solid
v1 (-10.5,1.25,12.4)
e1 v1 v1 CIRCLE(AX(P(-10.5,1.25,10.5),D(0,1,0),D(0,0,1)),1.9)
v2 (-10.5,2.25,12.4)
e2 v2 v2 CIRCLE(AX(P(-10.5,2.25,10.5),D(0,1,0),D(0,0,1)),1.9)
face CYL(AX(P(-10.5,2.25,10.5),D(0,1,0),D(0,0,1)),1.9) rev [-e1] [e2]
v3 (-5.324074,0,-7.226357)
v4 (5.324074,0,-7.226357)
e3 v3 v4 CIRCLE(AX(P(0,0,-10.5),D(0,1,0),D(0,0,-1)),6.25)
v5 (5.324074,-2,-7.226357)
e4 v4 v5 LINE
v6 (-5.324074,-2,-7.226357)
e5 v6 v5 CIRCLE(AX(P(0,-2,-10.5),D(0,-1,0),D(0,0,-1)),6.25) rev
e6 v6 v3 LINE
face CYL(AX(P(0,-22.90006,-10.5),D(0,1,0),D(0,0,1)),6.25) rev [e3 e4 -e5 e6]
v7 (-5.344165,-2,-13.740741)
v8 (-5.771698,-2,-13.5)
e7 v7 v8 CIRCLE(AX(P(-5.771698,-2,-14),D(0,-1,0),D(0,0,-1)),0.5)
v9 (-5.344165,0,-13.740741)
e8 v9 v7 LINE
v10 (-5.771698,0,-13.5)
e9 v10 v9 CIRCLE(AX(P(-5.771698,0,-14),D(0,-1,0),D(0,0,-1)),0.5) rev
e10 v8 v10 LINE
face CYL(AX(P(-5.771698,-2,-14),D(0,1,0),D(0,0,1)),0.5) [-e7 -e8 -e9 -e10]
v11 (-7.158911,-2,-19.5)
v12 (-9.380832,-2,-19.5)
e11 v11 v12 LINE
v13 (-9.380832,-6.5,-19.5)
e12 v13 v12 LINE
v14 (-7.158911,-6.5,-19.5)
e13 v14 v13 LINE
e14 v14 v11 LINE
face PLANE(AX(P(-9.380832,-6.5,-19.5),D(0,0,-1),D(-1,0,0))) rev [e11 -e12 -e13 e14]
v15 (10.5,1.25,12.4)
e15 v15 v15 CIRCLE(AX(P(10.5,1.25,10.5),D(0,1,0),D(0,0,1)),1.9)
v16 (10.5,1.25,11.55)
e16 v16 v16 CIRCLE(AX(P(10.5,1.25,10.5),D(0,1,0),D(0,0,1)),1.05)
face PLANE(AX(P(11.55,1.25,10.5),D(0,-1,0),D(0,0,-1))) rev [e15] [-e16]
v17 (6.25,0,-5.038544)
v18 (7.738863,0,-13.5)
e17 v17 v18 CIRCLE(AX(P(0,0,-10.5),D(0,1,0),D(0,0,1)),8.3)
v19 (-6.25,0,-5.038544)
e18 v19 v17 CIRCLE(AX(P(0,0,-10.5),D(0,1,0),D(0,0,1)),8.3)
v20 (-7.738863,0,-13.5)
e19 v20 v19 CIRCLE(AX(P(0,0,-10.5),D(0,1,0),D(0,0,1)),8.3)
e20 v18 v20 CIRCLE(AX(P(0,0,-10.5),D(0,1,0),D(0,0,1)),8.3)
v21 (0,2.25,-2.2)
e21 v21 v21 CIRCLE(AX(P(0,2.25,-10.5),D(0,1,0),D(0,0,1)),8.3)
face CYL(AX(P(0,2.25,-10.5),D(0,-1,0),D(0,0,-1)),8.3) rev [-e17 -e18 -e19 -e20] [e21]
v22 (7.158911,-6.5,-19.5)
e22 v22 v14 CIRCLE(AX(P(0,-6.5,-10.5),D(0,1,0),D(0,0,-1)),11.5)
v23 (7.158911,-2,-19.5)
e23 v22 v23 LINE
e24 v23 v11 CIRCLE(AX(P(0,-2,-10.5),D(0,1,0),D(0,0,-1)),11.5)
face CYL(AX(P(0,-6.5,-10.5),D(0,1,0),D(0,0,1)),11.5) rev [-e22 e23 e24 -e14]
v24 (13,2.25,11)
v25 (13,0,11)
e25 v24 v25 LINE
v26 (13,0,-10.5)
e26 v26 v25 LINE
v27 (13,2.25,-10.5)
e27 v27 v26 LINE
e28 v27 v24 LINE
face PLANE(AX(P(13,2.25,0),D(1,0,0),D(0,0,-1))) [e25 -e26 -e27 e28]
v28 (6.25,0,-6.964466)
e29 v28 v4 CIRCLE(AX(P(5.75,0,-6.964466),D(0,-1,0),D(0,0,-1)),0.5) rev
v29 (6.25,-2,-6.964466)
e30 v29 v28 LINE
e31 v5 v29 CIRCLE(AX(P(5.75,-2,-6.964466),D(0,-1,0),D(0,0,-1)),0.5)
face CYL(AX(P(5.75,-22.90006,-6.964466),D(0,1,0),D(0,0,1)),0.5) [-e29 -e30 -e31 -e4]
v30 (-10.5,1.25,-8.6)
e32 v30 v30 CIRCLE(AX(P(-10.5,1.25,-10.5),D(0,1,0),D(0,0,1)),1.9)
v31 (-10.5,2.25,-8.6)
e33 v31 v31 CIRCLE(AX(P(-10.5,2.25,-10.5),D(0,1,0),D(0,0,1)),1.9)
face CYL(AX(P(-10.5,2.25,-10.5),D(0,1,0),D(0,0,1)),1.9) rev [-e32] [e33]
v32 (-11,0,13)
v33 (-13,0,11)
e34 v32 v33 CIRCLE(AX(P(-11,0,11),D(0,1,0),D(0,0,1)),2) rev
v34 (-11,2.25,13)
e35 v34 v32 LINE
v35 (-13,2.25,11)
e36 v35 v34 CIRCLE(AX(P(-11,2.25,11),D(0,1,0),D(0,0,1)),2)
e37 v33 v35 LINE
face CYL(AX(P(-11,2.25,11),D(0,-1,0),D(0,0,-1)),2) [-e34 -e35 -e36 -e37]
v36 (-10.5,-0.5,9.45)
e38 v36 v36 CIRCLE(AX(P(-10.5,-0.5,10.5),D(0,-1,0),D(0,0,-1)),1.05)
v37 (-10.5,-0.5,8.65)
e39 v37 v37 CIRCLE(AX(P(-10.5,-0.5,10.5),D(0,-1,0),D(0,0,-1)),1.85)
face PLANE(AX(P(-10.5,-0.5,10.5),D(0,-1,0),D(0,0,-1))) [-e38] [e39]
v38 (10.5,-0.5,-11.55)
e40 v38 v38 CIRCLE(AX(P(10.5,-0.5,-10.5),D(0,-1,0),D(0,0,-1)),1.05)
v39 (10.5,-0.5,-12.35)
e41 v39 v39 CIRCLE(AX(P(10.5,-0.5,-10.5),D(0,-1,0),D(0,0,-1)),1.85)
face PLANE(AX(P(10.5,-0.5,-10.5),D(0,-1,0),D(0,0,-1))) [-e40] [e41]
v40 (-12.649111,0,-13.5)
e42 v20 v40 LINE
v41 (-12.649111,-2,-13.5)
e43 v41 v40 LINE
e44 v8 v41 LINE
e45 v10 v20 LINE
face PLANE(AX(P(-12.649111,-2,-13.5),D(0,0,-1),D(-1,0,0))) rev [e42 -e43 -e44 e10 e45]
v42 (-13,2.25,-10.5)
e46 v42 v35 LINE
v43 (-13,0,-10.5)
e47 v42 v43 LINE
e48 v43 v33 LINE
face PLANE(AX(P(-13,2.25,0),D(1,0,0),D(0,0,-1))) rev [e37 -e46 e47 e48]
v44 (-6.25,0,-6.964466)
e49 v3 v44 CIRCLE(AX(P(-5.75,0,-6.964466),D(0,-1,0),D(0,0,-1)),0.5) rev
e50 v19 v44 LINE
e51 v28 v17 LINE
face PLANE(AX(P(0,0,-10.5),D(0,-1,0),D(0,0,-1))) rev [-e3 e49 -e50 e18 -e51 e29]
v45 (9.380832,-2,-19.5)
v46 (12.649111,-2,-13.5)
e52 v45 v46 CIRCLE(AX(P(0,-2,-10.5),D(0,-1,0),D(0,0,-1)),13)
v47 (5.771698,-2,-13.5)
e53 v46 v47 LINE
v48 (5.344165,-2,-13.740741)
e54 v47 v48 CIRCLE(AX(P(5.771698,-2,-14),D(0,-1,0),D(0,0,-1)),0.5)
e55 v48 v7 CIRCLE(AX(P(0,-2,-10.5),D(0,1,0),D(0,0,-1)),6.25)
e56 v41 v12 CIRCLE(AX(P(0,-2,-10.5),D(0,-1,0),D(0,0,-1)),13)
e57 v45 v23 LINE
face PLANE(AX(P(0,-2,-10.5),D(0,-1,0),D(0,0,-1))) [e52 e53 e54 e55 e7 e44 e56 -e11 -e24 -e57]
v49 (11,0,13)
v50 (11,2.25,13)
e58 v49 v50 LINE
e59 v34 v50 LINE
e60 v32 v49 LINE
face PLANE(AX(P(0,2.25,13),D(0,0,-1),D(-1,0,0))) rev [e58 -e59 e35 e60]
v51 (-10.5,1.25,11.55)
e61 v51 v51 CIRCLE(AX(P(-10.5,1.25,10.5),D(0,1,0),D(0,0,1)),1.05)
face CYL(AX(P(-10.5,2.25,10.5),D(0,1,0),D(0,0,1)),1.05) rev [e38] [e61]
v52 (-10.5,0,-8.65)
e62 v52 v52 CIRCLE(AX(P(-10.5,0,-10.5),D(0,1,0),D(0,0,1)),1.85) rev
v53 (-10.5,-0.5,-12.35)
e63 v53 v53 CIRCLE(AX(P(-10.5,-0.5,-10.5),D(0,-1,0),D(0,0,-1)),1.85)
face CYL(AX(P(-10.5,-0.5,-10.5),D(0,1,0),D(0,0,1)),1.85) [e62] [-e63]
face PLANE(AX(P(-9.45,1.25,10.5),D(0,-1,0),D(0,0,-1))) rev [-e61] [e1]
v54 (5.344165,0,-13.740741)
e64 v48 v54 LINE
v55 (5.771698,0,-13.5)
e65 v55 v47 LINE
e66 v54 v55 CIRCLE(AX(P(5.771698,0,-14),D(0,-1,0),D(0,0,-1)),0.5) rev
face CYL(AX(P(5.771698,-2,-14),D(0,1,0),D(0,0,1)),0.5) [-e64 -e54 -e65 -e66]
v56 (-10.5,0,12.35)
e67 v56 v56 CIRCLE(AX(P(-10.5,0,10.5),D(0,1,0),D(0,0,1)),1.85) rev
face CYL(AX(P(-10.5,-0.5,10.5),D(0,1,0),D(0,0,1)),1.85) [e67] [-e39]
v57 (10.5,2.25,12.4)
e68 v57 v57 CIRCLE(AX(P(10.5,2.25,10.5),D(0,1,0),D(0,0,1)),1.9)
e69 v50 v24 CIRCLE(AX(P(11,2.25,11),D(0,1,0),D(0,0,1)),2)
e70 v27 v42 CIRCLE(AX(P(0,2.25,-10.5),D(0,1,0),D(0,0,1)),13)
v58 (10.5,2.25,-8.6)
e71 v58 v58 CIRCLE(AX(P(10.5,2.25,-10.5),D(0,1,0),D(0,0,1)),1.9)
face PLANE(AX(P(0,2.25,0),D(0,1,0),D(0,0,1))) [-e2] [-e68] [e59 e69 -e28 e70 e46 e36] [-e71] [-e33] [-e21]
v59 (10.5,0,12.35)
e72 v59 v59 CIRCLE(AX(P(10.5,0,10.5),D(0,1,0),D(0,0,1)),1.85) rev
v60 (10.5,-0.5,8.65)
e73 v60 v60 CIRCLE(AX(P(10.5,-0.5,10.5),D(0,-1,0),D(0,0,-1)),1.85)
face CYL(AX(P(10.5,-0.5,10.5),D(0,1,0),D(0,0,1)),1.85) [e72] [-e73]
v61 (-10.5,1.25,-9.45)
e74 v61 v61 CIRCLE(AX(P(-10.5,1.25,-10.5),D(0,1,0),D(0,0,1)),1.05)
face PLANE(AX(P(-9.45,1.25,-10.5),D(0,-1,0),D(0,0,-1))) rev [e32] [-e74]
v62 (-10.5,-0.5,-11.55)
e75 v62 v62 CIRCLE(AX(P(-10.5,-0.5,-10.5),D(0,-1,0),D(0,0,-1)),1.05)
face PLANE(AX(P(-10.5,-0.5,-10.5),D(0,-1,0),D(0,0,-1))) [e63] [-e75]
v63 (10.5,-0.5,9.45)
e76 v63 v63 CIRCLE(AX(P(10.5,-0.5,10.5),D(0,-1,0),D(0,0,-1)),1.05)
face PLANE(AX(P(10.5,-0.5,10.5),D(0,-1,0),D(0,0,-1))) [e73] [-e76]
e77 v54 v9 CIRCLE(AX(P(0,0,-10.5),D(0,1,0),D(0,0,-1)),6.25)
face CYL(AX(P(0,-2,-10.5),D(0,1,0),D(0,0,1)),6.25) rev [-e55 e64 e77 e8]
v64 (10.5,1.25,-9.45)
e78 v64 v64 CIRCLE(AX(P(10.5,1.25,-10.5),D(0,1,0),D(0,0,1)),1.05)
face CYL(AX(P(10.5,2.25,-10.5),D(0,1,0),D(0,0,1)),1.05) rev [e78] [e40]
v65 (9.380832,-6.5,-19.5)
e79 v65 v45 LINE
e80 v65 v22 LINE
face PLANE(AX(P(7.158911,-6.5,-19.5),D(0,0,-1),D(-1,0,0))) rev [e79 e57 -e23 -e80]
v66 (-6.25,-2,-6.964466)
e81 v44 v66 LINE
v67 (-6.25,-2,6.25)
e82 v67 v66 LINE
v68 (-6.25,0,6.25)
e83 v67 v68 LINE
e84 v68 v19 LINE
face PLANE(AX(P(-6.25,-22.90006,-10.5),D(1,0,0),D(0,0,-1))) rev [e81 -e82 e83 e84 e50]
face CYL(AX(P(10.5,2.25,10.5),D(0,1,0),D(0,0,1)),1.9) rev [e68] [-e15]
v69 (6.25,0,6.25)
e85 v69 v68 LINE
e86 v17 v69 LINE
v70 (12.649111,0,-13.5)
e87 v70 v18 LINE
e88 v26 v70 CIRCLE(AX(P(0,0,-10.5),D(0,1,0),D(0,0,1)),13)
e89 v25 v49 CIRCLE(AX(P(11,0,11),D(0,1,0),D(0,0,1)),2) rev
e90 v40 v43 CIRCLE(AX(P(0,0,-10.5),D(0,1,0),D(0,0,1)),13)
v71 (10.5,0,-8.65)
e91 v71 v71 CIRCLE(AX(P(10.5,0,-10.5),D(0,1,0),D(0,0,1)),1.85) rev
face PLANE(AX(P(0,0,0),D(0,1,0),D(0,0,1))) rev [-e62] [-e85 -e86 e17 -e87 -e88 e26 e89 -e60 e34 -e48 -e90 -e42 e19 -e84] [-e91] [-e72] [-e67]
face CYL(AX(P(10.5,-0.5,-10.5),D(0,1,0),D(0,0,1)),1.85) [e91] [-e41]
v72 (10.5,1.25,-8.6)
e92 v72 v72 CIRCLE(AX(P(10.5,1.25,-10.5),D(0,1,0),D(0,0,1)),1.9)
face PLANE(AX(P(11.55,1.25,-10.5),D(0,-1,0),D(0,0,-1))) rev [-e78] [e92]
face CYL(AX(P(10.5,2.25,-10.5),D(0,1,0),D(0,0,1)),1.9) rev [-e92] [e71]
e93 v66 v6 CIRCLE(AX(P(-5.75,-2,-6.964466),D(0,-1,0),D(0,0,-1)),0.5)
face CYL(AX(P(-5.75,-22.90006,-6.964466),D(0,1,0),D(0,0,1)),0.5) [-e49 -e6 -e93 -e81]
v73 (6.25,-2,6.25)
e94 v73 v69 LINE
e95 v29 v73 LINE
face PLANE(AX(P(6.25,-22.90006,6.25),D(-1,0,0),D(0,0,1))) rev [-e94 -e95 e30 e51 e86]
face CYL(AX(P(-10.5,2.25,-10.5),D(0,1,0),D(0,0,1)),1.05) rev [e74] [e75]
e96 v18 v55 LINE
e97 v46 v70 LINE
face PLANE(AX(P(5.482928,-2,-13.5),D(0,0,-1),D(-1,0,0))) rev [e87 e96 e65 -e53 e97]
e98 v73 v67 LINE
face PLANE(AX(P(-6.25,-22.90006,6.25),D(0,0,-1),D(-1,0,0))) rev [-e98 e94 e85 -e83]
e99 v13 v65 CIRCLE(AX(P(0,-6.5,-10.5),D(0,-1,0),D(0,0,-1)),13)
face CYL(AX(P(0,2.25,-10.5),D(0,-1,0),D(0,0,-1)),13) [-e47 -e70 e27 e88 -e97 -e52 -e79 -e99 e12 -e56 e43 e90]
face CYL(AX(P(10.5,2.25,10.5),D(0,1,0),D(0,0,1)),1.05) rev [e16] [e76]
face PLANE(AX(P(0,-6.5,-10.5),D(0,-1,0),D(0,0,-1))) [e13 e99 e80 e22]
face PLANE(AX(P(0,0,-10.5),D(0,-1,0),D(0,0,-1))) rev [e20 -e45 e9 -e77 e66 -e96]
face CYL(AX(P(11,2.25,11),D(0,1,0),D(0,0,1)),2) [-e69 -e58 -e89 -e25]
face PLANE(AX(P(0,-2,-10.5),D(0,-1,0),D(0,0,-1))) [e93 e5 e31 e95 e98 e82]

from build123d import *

# Parameters (mm, degrees)
SKETCH_1_R                   = 8.3
EXTRUDE_1_DEPTH              = 2.25
EXTRUDE_START                = 2
EXTRUDE_2_DEPTH              = 2
EXTRUDE_START_2              = 4.5
EXTRUDE_3_DEPTH              = 4.5
EXTRUDE_4_DEPTH              = 2
FILLET_1_R                   = 0.5
SKETCH_5_R                   = 1.85
EXTRUDE_5_DEPTH              = 0.5
HOLE_WIZARD_M2_1_D           = 2.1
HOLE_WIZARD_M2_1_CBORE_D     = 3.8
HOLE_WIZARD_M2_1_CBORE_DEPTH = 1
FILLET_2_R                   = 2


with BuildPart() as part:
    # ｽｹｯﾁ1 → ﾎﾞｽ - 押し出し1 (new body)
    with BuildSketch(Plane(origin=(0, 0, 0), x_dir=(1, 0, 0), z_dir=(0, 1, 0))):
        with BuildLine():
            ThreePointArc((13, 10.5), (0, 23.5), (-13, 10.5))
            Line((-13, 10.5), (-13, -13))
            Line((-13, -13), (13, -13))
            Line((13, -13), (13, 10.5))
        make_face()
        with Locations(Location((0, 10.5, 0), (0, 0, 270))):
            Circle(SKETCH_1_R, mode=Mode.SUBTRACT)
    extrude(amount=EXTRUDE_1_DEPTH)

    # ｽｹｯﾁ2 → ﾎﾞｽ - 押し出し2 (add)
    with BuildSketch(Plane.XZ.offset(EXTRUDE_START)):
        with BuildLine():
            Line((-12.649110641, -13.5), (-5.48292805, -13.5))
            ThreePointArc((-5.48292805, -13.5), (0, -16.75), (5.48292805, -13.5))
            Line((5.48292805, -13.5), (12.649110641, -13.5))
            ThreePointArc((12.649110641, -13.5), (0, -23.5), (-12.649110641, -13.5))
        make_face()
    extrude(amount=-EXTRUDE_2_DEPTH)

    # ｽｹｯﾁ3 → ﾎﾞｽ - 押し出し3 (add)
    with BuildSketch(Plane.XZ.offset(2).offset(EXTRUDE_START_2)):
        with BuildLine():
            Line((-9.38083152, -19.5), (-7.158910532, -19.5))
            ThreePointArc((-7.158910532, -19.5), (0, -22), (7.158910532, -19.5))
            Line((7.158910532, -19.5), (9.38083152, -19.5))
            ThreePointArc((9.38083152, -19.5), (0, -23.5), (-9.38083152, -19.5))
        make_face()
    extrude(amount=-EXTRUDE_3_DEPTH)

    # ｽｹｯﾁ4 → ﾎﾞｽ - 押し出し4 (add)
    with BuildSketch(Plane.XZ.offset(EXTRUDE_START)):
        with BuildLine():
            Line((-6.25, 6.25), (6.25, 6.25))
            Line((6.25, 6.25), (6.25, -10.5))
            ThreePointArc((6.25, -10.5), (0, -4.25), (-6.25, -10.5))
            Line((-6.25, -10.5), (-6.25, 6.25))
        make_face()
    extrude(amount=-EXTRUDE_4_DEPTH)

    # ﾌｨﾚｯﾄ1
    # the kernel refuses this fillet: 0.5 mm, written as the material it takes off along each edge
    with BuildSketch(Plane(origin=(5.48292805, -2.721925351, -13.5), x_dir=(1, 0, 0), z_dir=(0, 1, 0))) as fillet_1_piece_1:
        with BuildLine():
            CenterArc((0.28877014, 0.5), FILLET_1_R, 211.232929016, 58.767070984)
            ThreePointArc((-0.138763059, 0.240740741), (-0.068043475, 0.121141625), (0, 0))
            Line((0, 0), (0.28877014, 0))
        make_face()
    extrude(amount=3.443850702, mode=Mode.SUBTRACT)
    with BuildSketch(Plane(origin=(-5.48292805, -2.721925351, -13.5), x_dir=(-1, 0, 0), z_dir=(0, 1, 0))) as fillet_1_piece_2:
        with BuildLine():
            CenterArc((0.28877014, -0.5), FILLET_1_R, 90, 58.767070984)
            ThreePointArc((-0.138763059, -0.240740741), (-0.068043475, -0.121141625), (0, 0))
            Line((0, 0), (0.28877014, 0))
        make_face()
    extrude(amount=3.443850702, mode=Mode.SUBTRACT)
    with BuildSketch(Plane(origin=(-6.25, -10.838834765, -10.5), x_dir=(0, 0, 1), z_dir=(0, 1, 0))) as fillet_1_piece_3:
        with BuildLine():
            CenterArc((3.535533906, 0.5), FILLET_1_R, 121.586338097, 148.413661903)
            ThreePointArc((3.273642506, 0.925925926), (1.701034544, 0.235934696), (0, 0))
            Line((0, 0), (3.535533906, 0))
        make_face()
    extrude(amount=19.67766953, mode=Mode.SUBTRACT)
    with BuildSketch(Plane(origin=(6.25, -10.838834765, -10.5), x_dir=(0, 0, 1), z_dir=(0, 1, 0))) as fillet_1_piece_4:
        with BuildLine():
            CenterArc((3.535533906, -0.5), FILLET_1_R, 90, 148.413661903)
            ThreePointArc((3.273642506, -0.925925926), (1.701034544, -0.235934696), (0, 0))
            Line((0, 0), (3.535533906, 0))
        make_face()
    extrude(amount=19.67766953, mode=Mode.SUBTRACT)

    # ｽｹｯﾁ5 → ﾎﾞｽ - 押し出し5 (add)
    with BuildSketch(Plane.XZ):
        with Locations(Location((-10.5, 10.5, 0), (0, 0, 90))):
            Circle(SKETCH_5_R)
        with Locations(Location((10.5, 10.5, 0), (0, 0, 90))):
            Circle(SKETCH_5_R)
        with Locations(Location((-10.5, -10.5, 0), (0, 0, 90))):
            Circle(SKETCH_5_R)
        with Locations(Location((10.5, -10.5, 0), (0, 0, 90))):
            Circle(SKETCH_5_R)
    extrude(amount=EXTRUDE_5_DEPTH)

    # M2 丸平ねじ用座ぐり穴1 (through all)
    with Locations(Plane(origin=(0, 2.25, 0), x_dir=(1, 0, 0), z_dir=(0, 1, 0))):
        with Locations((10.5, 10.5), (-10.5, 10.5), (-10.5, -10.5), (10.5, -10.5)):
            CounterBoreHole(HOLE_WIZARD_M2_1_D / 2, HOLE_WIZARD_M2_1_CBORE_D / 2, HOLE_WIZARD_M2_1_CBORE_DEPTH)

    # ﾌｨﾚｯﾄ2
    fillet_2_edges = [part.edges().sort_by_distance(p)[0] for p in [
        (13, 1.125, 13),
        (-13, 1.125, 13),
    ]]
    fillet(fillet_2_edges, radius=FILLET_2_R)


solid = part.part
